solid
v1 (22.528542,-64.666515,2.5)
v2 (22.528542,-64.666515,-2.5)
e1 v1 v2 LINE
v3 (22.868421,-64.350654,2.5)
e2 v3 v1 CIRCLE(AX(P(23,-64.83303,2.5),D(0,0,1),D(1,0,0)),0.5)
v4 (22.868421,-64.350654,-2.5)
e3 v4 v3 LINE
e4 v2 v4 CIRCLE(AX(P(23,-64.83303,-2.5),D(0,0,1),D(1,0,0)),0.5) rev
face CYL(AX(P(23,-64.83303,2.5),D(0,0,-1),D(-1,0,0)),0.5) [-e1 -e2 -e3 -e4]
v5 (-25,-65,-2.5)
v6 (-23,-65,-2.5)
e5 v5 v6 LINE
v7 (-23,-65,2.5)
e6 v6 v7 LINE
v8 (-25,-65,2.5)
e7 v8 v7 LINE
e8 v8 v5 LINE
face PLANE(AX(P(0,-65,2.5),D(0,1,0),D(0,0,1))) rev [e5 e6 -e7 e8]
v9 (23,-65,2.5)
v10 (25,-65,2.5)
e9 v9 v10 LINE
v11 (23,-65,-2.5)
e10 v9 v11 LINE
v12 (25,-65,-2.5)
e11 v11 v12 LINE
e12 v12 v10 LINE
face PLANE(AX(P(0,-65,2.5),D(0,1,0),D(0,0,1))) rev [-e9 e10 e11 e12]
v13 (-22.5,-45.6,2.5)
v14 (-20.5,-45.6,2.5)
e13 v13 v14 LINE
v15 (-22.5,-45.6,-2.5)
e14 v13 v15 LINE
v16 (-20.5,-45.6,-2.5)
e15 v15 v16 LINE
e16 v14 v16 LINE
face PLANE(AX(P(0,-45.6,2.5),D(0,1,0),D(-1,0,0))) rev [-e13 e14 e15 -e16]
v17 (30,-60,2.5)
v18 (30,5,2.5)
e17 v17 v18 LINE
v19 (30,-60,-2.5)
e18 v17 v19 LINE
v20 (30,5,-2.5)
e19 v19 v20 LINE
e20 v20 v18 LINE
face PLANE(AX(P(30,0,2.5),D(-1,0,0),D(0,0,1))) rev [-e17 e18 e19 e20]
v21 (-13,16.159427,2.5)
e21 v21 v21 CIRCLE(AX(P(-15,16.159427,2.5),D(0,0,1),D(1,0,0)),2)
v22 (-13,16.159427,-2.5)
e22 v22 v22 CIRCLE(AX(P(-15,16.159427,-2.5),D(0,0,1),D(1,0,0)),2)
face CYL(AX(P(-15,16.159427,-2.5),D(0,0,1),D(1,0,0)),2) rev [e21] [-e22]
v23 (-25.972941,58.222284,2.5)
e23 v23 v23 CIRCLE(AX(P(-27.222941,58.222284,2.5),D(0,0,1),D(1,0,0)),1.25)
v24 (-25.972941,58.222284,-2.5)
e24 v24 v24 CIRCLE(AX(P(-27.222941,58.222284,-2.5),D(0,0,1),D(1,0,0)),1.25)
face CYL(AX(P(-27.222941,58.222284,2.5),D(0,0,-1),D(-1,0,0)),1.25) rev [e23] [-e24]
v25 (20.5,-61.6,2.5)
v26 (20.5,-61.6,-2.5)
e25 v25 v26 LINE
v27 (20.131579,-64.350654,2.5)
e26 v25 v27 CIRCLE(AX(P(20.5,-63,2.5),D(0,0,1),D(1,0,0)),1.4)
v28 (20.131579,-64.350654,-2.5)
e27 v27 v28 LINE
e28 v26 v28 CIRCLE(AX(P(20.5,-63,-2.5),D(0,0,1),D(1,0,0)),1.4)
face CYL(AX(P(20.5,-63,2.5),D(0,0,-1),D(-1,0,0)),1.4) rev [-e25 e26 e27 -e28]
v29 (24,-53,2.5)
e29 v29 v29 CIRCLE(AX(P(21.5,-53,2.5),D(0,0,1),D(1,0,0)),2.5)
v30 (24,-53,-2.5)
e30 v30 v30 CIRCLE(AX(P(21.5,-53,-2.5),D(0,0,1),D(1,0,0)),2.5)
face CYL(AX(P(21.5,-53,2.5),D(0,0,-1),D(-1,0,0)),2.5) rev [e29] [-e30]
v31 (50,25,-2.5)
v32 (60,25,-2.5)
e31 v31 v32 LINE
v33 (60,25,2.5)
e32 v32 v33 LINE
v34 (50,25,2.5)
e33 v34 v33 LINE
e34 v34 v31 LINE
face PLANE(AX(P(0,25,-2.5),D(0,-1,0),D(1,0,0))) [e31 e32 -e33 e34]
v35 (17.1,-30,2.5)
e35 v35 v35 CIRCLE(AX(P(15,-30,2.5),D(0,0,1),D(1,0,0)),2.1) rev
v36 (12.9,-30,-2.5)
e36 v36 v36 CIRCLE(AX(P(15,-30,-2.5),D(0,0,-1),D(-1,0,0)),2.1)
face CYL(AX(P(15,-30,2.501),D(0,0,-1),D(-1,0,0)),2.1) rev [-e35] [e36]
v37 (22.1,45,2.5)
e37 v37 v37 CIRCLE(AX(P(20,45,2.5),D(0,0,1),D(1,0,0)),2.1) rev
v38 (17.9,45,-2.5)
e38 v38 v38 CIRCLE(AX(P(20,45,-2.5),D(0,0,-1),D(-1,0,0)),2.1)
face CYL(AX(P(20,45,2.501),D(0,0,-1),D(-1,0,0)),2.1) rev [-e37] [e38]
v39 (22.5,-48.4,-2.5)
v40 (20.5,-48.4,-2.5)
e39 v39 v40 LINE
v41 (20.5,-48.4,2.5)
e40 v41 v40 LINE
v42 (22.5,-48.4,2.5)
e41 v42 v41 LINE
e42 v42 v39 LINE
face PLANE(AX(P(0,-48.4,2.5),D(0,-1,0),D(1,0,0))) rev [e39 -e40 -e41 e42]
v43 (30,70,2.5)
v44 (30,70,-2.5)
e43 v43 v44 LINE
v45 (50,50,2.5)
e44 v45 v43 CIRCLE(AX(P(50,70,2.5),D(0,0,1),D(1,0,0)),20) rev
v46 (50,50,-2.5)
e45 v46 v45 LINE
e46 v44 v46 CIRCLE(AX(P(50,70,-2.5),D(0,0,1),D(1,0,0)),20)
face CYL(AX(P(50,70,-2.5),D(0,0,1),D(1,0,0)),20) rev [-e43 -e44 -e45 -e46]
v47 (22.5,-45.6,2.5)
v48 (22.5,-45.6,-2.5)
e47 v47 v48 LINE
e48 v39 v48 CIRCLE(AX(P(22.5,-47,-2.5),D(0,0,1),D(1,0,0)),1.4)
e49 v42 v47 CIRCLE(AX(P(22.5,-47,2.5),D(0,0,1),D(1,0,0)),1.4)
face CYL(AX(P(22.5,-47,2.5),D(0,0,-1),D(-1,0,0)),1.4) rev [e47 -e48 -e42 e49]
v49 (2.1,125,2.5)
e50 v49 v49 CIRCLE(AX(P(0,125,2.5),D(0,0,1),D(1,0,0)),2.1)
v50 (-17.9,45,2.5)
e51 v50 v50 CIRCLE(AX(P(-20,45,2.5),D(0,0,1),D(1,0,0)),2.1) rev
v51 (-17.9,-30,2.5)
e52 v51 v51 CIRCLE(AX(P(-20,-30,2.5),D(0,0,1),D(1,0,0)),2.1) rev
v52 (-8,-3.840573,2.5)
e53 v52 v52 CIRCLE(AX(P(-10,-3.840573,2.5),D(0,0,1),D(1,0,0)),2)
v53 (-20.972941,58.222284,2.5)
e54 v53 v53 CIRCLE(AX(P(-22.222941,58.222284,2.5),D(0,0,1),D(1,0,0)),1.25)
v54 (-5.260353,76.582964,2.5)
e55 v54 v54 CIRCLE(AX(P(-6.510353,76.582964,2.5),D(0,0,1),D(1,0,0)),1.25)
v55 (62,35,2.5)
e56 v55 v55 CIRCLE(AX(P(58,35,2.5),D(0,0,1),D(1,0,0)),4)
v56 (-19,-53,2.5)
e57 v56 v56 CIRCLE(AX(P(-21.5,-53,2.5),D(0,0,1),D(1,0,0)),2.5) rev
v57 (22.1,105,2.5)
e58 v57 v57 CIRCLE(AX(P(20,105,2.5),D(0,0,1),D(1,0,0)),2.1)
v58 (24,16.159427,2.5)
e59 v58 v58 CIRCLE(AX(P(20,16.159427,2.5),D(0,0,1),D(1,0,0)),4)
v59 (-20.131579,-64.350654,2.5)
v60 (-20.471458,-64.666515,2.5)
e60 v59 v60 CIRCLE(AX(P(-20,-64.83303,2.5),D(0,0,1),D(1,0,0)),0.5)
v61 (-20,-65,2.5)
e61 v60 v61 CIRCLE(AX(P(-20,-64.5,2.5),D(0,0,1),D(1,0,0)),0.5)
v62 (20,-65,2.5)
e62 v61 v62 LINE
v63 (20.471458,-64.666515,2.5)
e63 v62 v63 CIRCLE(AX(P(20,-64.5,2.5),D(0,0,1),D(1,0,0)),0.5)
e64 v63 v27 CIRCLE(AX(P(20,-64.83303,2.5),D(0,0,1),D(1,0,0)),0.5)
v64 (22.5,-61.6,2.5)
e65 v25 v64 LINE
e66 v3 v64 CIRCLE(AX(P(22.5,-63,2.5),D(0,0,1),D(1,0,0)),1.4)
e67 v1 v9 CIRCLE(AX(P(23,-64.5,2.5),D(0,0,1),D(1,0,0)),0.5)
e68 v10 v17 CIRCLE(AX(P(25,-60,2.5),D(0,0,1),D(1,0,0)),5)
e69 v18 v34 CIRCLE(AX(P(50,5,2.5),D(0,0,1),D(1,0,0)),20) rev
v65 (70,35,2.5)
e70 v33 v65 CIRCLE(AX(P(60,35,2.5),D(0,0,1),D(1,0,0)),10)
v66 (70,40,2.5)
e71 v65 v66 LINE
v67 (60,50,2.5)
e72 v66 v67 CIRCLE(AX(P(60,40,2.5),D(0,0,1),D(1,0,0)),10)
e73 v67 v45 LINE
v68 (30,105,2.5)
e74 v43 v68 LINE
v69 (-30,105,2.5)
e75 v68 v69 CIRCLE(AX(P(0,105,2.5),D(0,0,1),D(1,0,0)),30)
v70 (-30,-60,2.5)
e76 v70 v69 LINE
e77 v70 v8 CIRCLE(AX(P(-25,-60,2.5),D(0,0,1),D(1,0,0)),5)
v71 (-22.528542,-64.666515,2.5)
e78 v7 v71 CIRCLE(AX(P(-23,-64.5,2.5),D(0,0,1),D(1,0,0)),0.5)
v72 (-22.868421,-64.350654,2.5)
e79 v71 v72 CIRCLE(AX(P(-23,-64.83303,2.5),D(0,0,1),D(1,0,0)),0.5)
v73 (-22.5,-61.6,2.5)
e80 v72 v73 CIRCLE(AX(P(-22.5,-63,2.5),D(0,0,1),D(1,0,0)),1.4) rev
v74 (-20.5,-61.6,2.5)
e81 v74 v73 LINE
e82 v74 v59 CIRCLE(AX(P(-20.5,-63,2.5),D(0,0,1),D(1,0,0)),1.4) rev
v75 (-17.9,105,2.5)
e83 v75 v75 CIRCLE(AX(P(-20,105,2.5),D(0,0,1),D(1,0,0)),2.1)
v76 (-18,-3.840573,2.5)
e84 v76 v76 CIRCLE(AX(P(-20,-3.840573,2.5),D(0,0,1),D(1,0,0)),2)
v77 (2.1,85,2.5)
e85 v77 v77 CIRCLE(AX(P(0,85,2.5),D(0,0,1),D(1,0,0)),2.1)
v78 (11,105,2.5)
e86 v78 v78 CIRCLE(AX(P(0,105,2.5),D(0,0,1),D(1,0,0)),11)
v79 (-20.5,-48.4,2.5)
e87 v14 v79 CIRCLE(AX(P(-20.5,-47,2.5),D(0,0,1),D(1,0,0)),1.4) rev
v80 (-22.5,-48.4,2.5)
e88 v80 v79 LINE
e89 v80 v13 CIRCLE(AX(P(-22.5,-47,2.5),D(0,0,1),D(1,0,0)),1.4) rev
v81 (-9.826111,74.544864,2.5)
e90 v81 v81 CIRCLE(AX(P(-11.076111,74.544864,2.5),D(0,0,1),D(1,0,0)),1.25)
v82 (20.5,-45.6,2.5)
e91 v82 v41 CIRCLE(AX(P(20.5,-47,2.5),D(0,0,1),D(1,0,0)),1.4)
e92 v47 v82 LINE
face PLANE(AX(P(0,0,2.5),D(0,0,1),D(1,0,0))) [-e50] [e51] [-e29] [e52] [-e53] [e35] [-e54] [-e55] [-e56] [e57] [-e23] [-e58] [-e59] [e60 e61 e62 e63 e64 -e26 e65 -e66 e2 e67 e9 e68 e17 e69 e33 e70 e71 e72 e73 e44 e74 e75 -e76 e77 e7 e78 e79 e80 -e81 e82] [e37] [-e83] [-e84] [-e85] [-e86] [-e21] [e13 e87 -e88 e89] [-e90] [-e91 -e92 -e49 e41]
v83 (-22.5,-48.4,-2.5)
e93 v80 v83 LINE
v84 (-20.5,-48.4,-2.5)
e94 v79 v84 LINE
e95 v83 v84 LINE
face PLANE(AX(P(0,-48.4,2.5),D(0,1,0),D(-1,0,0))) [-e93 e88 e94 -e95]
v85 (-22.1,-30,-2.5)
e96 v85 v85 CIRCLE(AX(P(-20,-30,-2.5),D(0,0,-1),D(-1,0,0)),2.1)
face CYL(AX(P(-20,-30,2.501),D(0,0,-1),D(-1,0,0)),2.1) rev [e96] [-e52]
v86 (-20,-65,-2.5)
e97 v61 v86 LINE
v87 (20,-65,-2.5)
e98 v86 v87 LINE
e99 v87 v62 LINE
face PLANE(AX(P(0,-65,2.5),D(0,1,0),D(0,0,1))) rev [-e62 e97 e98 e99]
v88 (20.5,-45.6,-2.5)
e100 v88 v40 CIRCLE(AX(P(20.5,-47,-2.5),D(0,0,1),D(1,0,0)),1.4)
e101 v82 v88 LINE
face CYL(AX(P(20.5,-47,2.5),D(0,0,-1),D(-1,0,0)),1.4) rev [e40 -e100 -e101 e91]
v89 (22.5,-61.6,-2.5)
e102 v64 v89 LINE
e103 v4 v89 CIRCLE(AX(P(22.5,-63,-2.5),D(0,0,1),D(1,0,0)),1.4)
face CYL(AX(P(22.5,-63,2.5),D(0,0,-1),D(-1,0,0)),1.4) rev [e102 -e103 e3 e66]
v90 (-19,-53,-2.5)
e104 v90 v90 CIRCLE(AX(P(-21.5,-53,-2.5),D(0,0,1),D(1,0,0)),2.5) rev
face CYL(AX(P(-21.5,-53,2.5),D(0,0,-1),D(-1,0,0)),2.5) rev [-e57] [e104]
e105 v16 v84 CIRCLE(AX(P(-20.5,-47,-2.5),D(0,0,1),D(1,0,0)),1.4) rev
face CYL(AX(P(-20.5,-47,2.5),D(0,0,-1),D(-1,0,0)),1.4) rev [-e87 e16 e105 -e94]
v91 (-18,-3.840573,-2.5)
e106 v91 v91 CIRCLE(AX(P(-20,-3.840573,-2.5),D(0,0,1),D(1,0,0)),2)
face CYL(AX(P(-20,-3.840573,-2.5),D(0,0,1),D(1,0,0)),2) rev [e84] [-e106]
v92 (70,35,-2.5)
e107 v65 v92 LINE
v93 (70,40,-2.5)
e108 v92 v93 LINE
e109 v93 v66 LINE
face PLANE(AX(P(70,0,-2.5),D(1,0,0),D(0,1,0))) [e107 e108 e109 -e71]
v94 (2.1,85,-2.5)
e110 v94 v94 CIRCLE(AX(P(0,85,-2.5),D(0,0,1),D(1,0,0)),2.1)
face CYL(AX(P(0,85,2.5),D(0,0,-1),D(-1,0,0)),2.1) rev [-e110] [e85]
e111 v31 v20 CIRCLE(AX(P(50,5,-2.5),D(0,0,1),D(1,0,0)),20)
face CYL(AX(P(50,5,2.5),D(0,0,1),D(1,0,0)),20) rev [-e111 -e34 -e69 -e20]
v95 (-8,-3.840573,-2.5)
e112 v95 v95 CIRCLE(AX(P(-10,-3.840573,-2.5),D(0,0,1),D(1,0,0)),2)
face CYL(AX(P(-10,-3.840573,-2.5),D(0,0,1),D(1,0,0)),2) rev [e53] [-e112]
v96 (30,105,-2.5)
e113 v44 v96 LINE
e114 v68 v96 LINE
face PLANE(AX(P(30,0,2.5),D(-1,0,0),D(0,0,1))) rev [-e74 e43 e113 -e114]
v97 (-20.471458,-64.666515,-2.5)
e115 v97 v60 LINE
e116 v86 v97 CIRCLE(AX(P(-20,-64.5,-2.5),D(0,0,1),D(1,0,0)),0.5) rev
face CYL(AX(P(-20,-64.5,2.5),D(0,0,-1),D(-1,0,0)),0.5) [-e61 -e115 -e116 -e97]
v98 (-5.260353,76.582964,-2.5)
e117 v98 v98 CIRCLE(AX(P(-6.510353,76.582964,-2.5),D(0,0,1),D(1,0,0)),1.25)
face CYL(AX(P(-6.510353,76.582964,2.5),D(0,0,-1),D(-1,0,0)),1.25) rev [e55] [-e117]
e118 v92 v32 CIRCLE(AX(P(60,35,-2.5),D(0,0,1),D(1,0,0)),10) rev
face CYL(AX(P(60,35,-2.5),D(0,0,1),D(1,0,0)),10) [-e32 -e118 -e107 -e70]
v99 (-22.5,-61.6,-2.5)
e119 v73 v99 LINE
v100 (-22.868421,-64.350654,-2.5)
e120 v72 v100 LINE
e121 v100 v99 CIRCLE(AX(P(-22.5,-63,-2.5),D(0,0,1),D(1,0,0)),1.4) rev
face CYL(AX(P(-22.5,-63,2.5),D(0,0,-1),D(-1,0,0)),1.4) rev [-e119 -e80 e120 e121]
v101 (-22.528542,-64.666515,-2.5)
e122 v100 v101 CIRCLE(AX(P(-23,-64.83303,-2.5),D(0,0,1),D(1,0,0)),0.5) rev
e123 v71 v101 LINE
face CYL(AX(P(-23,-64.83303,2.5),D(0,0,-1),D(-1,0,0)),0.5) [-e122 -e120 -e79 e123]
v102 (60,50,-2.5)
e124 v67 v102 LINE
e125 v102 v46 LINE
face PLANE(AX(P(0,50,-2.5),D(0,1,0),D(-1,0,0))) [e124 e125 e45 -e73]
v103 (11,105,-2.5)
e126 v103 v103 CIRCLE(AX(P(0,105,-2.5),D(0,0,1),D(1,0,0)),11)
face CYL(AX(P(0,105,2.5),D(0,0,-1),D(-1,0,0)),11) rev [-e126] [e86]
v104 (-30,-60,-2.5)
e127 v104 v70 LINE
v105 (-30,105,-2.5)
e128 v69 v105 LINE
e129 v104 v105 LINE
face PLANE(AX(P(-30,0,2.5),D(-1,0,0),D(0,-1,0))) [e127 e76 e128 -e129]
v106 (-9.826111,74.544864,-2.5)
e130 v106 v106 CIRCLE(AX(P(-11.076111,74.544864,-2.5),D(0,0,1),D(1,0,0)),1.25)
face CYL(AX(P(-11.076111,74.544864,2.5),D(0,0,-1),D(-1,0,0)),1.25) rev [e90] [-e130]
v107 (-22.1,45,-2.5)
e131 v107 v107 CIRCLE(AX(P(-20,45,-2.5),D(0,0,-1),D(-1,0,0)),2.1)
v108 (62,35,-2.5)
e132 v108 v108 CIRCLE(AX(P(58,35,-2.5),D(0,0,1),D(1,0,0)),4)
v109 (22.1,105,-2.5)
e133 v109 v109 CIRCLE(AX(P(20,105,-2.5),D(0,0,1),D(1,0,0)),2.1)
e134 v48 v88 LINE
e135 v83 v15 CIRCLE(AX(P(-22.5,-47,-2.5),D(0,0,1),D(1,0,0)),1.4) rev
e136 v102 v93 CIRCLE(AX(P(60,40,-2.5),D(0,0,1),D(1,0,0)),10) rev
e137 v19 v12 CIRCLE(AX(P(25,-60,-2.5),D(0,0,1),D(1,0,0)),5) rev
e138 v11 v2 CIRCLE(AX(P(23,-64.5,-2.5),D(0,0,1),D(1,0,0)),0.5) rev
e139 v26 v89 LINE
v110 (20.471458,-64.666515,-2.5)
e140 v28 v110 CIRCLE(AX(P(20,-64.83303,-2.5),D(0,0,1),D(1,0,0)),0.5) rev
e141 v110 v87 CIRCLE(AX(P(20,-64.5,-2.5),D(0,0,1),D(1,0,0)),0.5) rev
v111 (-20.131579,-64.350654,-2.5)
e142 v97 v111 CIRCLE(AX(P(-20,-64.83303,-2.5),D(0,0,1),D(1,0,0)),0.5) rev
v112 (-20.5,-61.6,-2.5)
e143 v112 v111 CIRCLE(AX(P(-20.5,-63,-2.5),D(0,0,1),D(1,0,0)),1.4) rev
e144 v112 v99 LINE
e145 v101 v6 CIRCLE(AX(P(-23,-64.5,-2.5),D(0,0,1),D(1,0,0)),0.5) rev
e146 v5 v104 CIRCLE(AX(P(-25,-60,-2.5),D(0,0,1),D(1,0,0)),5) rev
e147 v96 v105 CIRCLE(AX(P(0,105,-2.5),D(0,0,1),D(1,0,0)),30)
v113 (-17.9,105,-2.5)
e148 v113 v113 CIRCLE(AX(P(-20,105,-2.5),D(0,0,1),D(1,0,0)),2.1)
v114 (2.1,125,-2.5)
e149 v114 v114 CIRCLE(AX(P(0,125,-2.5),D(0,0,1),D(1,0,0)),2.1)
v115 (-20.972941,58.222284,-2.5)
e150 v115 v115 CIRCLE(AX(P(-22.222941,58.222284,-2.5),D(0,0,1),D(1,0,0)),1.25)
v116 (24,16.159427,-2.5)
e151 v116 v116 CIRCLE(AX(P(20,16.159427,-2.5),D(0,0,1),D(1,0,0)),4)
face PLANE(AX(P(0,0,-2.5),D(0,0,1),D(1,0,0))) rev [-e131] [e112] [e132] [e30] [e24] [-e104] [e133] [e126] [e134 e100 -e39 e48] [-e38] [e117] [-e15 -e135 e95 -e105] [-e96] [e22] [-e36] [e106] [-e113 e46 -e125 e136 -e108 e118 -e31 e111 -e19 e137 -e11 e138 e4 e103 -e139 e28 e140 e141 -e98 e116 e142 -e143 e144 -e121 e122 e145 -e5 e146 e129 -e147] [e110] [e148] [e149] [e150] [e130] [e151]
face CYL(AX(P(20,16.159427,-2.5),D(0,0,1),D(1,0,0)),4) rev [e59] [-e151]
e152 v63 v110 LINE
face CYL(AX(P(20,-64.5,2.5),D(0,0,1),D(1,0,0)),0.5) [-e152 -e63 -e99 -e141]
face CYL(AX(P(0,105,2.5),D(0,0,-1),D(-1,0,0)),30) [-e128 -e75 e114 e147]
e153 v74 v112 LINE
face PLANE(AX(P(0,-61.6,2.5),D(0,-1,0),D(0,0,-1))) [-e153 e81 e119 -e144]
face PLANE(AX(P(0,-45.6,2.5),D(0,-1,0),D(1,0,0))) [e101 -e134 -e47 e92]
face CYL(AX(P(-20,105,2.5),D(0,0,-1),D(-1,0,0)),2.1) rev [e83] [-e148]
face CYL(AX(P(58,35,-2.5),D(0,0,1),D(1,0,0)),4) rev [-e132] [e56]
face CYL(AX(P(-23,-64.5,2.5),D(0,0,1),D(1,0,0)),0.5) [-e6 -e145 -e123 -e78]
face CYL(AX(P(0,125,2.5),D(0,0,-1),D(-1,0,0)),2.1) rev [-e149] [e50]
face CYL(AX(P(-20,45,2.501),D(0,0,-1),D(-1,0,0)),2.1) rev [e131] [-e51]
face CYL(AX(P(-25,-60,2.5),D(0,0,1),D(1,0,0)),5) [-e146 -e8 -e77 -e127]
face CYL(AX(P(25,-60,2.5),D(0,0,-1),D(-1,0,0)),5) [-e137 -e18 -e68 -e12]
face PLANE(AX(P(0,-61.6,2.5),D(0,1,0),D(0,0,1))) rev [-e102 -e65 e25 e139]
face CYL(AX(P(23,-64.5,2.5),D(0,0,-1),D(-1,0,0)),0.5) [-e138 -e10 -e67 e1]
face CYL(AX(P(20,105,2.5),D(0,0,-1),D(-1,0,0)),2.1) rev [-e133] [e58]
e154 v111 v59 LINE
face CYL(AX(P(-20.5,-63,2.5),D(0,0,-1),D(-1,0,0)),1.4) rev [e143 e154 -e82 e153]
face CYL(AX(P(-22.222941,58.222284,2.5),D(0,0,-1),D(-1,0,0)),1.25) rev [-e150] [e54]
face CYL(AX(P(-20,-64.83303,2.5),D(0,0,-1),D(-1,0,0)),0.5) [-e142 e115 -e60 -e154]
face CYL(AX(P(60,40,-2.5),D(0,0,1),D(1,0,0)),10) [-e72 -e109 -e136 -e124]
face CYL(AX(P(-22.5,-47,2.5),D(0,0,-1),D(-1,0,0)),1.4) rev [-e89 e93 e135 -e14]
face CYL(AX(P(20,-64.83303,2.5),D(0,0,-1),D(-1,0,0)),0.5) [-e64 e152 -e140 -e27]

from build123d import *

# Parameters (mm, degrees)
SKETCH1_R           = 2.5
SKETCH1_R_2         = 1.250000001
SKETCH1_R_3         = 1.25
SKETCH1_R_4         = 2.1
SKETCH1_R_5         = 11
BOSS_EXTRUDE1_DEPTH = 2.5
CUT_EXTRUDE15_REACH = 140.384
SKETCH15_R          = 2.1
FILLET1_R           = 5
FILLET2_R           = 0.5
SKETCH21_R          = 2
SKETCH21_R_2        = 4
CUT_EXTRUDE21_DEPTH = 139.383525031
SKETCH22_W          = 40
SKETCH22_H          = 25
SKETCH22_R          = 4
BOSS_EXTRUDE2_DEPTH = 5
FILLET10_R          = 20
FILLET11_R          = 10


with BuildPart() as part:
    # Sketch1 → Boss-Extrude1 (new, symmetric)
    with BuildSketch(Plane.XY):
        with BuildLine():
            ThreePointArc((20.5, -64.4), (19.1, -63), (20.5, -61.6))
            Line((20.5, -61.6), (22.5, -61.6))
            ThreePointArc((22.5, -61.6), (23.9, -63), (22.5, -64.4))
            Line((22.5, -64.4), (22.5, -65))
            Line((22.5, -65), (30, -65))
            Line((30, -65), (30, 105))
            ThreePointArc((30, 105), (0, 135), (-30, 105))
            Line((-30, 105), (-30, -65))
            Line((-30, -65), (-22.5, -65))
            Line((-22.5, -65), (-22.5, -64.4))
            ThreePointArc((-22.5, -64.4), (-23.9, -63), (-22.5, -61.6))
            Line((-22.5, -61.6), (-20.5, -61.6))
            ThreePointArc((-20.5, -61.6), (-19.1, -63), (-20.5, -64.4))
            Line((-20.5, -64.4), (-20.5, -65))
            Line((-20.5, -65), (20.5, -65))
            Line((20.5, -65), (20.5, -64.4))
        make_face()
        with Locations((-21.5, -53)):
            Circle(SKETCH1_R, mode=Mode.SUBTRACT)
        with BuildLine():
            Line((-20.5, -48.4), (-22.5, -48.4))
            ThreePointArc((-22.5, -48.4), (-23.9, -47), (-22.5, -45.6))
            Line((-22.5, -45.6), (-20.5, -45.6))
            ThreePointArc((-20.5, -45.6), (-19.1, -47), (-20.5, -48.4))
        make_face(mode=Mode.SUBTRACT)
        with Locations((21.5, -53)):
            Circle(SKETCH1_R, mode=Mode.SUBTRACT)
        with BuildLine():
            ThreePointArc((22.5, -45.6), (23.9, -47), (22.5, -48.4))
            Line((22.5, -48.4), (20.5, -48.4))
            ThreePointArc((20.5, -48.4), (19.1, -47), (20.5, -45.6))
            Line((20.5, -45.6), (22.5, -45.6))
        make_face(mode=Mode.SUBTRACT)
        with Locations((-27.222941247, 58.222284236)):
            Circle(SKETCH1_R_2, mode=Mode.SUBTRACT)
        with Locations((-22.222941247, 58.222284236)):
            Circle(SKETCH1_R_2, mode=Mode.SUBTRACT)
        with Locations((-11.076110698, 74.544863638)):
            Circle(SKETCH1_R_3, mode=Mode.SUBTRACT)
        with Locations((-6.51035255, 76.582963865)):
            Circle(SKETCH1_R_3, mode=Mode.SUBTRACT)
        with Locations((-20, 105)):
            Circle(SKETCH1_R_4, mode=Mode.SUBTRACT)
        with Locations((0, 105)):
            Circle(SKETCH1_R_5, mode=Mode.SUBTRACT)
        with Locations((0, 125)):
            Circle(SKETCH1_R_4, mode=Mode.SUBTRACT)
        with Locations((0, 85)):
            Circle(SKETCH1_R_4, mode=Mode.SUBTRACT)
        with Locations((20, 105)):
            Circle(SKETCH1_R_4, mode=Mode.SUBTRACT)
    extrude(amount=BOSS_EXTRUDE1_DEPTH, both=True)

    # Sketch15 → Cut-Extrude15 (cut, up to next)
    with BuildSketch(Plane(origin=(0, 0, -2.5), x_dir=(-1, 0, 0), z_dir=(0, 0, -1)), mode=Mode.PRIVATE) as cut_extrude15_sk1:
        with Locations((20, -30)):
            Circle(SKETCH15_R)
    cut_extrude15_tool1 = extrude(cut_extrude15_sk1.sketch, amount=-CUT_EXTRUDE15_REACH, mode=Mode.PRIVATE) & part.part
    # Sketch15 → Cut-Extrude15 (cut, up to next)
    with BuildSketch(Plane(origin=(0, 0, -2.5), x_dir=(-1, 0, 0), z_dir=(0, 0, -1)), mode=Mode.PRIVATE) as cut_extrude15_sk2:
        with Locations((-15, -30)):
            Circle(SKETCH15_R)
    cut_extrude15_tool2 = extrude(cut_extrude15_sk2.sketch, amount=-CUT_EXTRUDE15_REACH, mode=Mode.PRIVATE) & part.part
    # Sketch15 → Cut-Extrude15 (cut, up to next)
    with BuildSketch(Plane(origin=(0, 0, -2.5), x_dir=(-1, 0, 0), z_dir=(0, 0, -1)), mode=Mode.PRIVATE) as cut_extrude15_sk3:
        with Locations((-20, 45)):
            Circle(SKETCH15_R)
    cut_extrude15_tool3 = extrude(cut_extrude15_sk3.sketch, amount=-CUT_EXTRUDE15_REACH, mode=Mode.PRIVATE) & part.part
    # Sketch15 → Cut-Extrude15 (cut, up to next)
    with BuildSketch(Plane(origin=(0, 0, -2.5), x_dir=(-1, 0, 0), z_dir=(0, 0, -1)), mode=Mode.PRIVATE) as cut_extrude15_sk4:
        with Locations((20, 45)):
            Circle(SKETCH15_R)
    cut_extrude15_tool4 = extrude(cut_extrude15_sk4.sketch, amount=-CUT_EXTRUDE15_REACH, mode=Mode.PRIVATE) & part.part
    add(cut_extrude15_tool1.solids().sort_by_distance((-20, -30, -2.5))[0], mode=Mode.SUBTRACT)
    add(cut_extrude15_tool2.solids().sort_by_distance((15, -30, -2.5))[0], mode=Mode.SUBTRACT)
    add(cut_extrude15_tool3.solids().sort_by_distance((20, 45, -2.5))[0], mode=Mode.SUBTRACT)
    add(cut_extrude15_tool4.solids().sort_by_distance((-20, 45, -2.5))[0], mode=Mode.SUBTRACT)

    # Fillet1
    fillet1_edges = [part.edges().sort_by_distance(p)[0] for p in [
        (-30, -65, 0),
        (30, -65, 0),
    ]]
    fillet(fillet1_edges, radius=FILLET1_R)

    # Fillet2
    # the kernel refuses this fillet: 0.5 mm, written as the material it takes off along each edge
    with BuildSketch(Plane(origin=(22.5, -65, -3.75), x_dir=(1, 0, 0), z_dir=(0, 0, 1)), Plane(origin=(-20.5, -65, 3.75), x_dir=(0, 1, 0), z_dir=(0, 0, -1))) as fillet2_piece_1:
        with BuildLine():
            CenterArc((FILLET2_R, FILLET2_R), FILLET2_R, 180, 90)
            Line((0, FILLET2_R), (0, 0))
            Line((0, 0), (FILLET2_R, 0))
        make_face()
    extrude(amount=7.5, mode=Mode.SUBTRACT)
    with BuildSketch(Plane(origin=(22.5, -64.4, -3.582575695), x_dir=(0, -1, 0), z_dir=(0, 0, 1))) as fillet2_piece_2:
        with BuildLine():
            CenterArc((0.433030278, 0.5), FILLET2_R, 195.25752329, 74.74247671)
            ThreePointArc((-0.049346111, 0.368421053), (-0.012391366, 0.185855529), (0, 0))
            Line((0, 0), (0.433030278, 0))
        make_face()
    extrude(amount=7.16515139, mode=Mode.SUBTRACT)
    with BuildSketch(Plane(origin=(20.5, -64.4, -3.582575695), x_dir=(0, -1, 0), z_dir=(0, 0, 1)), Plane(origin=(-22.5, -64.4, -3.582575695), x_dir=(0, -1, 0), z_dir=(0, 0, 1))) as fillet2_piece_3:
        with BuildLine():
            CenterArc((0.433030278, -0.5), FILLET2_R, 90, 74.74247671)
            ThreePointArc((-0.049346111, -0.368421053), (-0.012391366, -0.185855529), (0, 0))
            Line((0, 0), (0.433030278, 0))
        make_face()
    extrude(amount=7.16515139, mode=Mode.SUBTRACT)
    with BuildSketch(Plane(origin=(20.5, -65, -3.75), x_dir=(-1, 0, 0), z_dir=(0, 0, 1)), Plane(origin=(-22.5, -65, -3.75), x_dir=(-1, 0, 0), z_dir=(0, 0, 1))) as fillet2_piece_4:
        with BuildLine():
            CenterArc((FILLET2_R, -FILLET2_R), FILLET2_R, 90, 90)
            Line((0, -FILLET2_R), (0, 0))
            Line((0, 0), (FILLET2_R, 0))
        make_face()
    extrude(amount=7.5, mode=Mode.SUBTRACT)
    with BuildSketch(Plane(origin=(-20.5, -64.4, 3.582575695), x_dir=(0.9911490245884916, 0.1327539493095473, 0), z_dir=(0, 0, -1))) as fillet2_piece_5:
        with BuildLine():
            CenterArc((0.438088033, 0.495574512), FILLET2_R, 187.628761645, 74.74247671)
            Line((-0.05748648, 0.429197538), (0, 0))
            ThreePointArc((0, 0), (0.185855529, 0.012391366), (0.371711058, 0))
        make_face()
    extrude(amount=7.16515139, mode=Mode.SUBTRACT)

    # Sketch21 → Cut-Extrude21 (cut, through all)
    with BuildSketch(Plane.XY.offset(2.5)):
        with Locations((-20, -3.840572854)):
            Circle(SKETCH21_R)
        with Locations((-10, -3.840572854)):
            Circle(SKETCH21_R)
        with Locations((-15, 16.159427146)):
            Circle(SKETCH21_R)
        with Locations((20, 16.159427146)):
            Circle(SKETCH21_R_2)
    extrude(amount=-CUT_EXTRUDE21_DEPTH, mode=Mode.SUBTRACT)

    # Sketch22 → Boss-Extrude2 (add)
    with BuildSketch(Plane.XY.offset(2.5)):
        with Locations((50, 37.5)):
            Rectangle(SKETCH22_W, SKETCH22_H)
        with Locations((58, 35)):
            Circle(SKETCH22_R, mode=Mode.SUBTRACT)
    extrude(amount=-BOSS_EXTRUDE2_DEPTH)

    # Fillet10
    fillet10_edges = [part.edges().sort_by_distance(p)[0] for p in [
        (30, 25, 0),
        (30, 50, 0),
    ]]
    fillet(fillet10_edges, radius=FILLET10_R)

    # Fillet11
    fillet11_edges = [part.edges().sort_by_distance(p)[0] for p in [
        (70, 50, 0),
        (70, 25, 0),
    ]]
    fillet(fillet11_edges, radius=FILLET11_R)


solid = part.part
